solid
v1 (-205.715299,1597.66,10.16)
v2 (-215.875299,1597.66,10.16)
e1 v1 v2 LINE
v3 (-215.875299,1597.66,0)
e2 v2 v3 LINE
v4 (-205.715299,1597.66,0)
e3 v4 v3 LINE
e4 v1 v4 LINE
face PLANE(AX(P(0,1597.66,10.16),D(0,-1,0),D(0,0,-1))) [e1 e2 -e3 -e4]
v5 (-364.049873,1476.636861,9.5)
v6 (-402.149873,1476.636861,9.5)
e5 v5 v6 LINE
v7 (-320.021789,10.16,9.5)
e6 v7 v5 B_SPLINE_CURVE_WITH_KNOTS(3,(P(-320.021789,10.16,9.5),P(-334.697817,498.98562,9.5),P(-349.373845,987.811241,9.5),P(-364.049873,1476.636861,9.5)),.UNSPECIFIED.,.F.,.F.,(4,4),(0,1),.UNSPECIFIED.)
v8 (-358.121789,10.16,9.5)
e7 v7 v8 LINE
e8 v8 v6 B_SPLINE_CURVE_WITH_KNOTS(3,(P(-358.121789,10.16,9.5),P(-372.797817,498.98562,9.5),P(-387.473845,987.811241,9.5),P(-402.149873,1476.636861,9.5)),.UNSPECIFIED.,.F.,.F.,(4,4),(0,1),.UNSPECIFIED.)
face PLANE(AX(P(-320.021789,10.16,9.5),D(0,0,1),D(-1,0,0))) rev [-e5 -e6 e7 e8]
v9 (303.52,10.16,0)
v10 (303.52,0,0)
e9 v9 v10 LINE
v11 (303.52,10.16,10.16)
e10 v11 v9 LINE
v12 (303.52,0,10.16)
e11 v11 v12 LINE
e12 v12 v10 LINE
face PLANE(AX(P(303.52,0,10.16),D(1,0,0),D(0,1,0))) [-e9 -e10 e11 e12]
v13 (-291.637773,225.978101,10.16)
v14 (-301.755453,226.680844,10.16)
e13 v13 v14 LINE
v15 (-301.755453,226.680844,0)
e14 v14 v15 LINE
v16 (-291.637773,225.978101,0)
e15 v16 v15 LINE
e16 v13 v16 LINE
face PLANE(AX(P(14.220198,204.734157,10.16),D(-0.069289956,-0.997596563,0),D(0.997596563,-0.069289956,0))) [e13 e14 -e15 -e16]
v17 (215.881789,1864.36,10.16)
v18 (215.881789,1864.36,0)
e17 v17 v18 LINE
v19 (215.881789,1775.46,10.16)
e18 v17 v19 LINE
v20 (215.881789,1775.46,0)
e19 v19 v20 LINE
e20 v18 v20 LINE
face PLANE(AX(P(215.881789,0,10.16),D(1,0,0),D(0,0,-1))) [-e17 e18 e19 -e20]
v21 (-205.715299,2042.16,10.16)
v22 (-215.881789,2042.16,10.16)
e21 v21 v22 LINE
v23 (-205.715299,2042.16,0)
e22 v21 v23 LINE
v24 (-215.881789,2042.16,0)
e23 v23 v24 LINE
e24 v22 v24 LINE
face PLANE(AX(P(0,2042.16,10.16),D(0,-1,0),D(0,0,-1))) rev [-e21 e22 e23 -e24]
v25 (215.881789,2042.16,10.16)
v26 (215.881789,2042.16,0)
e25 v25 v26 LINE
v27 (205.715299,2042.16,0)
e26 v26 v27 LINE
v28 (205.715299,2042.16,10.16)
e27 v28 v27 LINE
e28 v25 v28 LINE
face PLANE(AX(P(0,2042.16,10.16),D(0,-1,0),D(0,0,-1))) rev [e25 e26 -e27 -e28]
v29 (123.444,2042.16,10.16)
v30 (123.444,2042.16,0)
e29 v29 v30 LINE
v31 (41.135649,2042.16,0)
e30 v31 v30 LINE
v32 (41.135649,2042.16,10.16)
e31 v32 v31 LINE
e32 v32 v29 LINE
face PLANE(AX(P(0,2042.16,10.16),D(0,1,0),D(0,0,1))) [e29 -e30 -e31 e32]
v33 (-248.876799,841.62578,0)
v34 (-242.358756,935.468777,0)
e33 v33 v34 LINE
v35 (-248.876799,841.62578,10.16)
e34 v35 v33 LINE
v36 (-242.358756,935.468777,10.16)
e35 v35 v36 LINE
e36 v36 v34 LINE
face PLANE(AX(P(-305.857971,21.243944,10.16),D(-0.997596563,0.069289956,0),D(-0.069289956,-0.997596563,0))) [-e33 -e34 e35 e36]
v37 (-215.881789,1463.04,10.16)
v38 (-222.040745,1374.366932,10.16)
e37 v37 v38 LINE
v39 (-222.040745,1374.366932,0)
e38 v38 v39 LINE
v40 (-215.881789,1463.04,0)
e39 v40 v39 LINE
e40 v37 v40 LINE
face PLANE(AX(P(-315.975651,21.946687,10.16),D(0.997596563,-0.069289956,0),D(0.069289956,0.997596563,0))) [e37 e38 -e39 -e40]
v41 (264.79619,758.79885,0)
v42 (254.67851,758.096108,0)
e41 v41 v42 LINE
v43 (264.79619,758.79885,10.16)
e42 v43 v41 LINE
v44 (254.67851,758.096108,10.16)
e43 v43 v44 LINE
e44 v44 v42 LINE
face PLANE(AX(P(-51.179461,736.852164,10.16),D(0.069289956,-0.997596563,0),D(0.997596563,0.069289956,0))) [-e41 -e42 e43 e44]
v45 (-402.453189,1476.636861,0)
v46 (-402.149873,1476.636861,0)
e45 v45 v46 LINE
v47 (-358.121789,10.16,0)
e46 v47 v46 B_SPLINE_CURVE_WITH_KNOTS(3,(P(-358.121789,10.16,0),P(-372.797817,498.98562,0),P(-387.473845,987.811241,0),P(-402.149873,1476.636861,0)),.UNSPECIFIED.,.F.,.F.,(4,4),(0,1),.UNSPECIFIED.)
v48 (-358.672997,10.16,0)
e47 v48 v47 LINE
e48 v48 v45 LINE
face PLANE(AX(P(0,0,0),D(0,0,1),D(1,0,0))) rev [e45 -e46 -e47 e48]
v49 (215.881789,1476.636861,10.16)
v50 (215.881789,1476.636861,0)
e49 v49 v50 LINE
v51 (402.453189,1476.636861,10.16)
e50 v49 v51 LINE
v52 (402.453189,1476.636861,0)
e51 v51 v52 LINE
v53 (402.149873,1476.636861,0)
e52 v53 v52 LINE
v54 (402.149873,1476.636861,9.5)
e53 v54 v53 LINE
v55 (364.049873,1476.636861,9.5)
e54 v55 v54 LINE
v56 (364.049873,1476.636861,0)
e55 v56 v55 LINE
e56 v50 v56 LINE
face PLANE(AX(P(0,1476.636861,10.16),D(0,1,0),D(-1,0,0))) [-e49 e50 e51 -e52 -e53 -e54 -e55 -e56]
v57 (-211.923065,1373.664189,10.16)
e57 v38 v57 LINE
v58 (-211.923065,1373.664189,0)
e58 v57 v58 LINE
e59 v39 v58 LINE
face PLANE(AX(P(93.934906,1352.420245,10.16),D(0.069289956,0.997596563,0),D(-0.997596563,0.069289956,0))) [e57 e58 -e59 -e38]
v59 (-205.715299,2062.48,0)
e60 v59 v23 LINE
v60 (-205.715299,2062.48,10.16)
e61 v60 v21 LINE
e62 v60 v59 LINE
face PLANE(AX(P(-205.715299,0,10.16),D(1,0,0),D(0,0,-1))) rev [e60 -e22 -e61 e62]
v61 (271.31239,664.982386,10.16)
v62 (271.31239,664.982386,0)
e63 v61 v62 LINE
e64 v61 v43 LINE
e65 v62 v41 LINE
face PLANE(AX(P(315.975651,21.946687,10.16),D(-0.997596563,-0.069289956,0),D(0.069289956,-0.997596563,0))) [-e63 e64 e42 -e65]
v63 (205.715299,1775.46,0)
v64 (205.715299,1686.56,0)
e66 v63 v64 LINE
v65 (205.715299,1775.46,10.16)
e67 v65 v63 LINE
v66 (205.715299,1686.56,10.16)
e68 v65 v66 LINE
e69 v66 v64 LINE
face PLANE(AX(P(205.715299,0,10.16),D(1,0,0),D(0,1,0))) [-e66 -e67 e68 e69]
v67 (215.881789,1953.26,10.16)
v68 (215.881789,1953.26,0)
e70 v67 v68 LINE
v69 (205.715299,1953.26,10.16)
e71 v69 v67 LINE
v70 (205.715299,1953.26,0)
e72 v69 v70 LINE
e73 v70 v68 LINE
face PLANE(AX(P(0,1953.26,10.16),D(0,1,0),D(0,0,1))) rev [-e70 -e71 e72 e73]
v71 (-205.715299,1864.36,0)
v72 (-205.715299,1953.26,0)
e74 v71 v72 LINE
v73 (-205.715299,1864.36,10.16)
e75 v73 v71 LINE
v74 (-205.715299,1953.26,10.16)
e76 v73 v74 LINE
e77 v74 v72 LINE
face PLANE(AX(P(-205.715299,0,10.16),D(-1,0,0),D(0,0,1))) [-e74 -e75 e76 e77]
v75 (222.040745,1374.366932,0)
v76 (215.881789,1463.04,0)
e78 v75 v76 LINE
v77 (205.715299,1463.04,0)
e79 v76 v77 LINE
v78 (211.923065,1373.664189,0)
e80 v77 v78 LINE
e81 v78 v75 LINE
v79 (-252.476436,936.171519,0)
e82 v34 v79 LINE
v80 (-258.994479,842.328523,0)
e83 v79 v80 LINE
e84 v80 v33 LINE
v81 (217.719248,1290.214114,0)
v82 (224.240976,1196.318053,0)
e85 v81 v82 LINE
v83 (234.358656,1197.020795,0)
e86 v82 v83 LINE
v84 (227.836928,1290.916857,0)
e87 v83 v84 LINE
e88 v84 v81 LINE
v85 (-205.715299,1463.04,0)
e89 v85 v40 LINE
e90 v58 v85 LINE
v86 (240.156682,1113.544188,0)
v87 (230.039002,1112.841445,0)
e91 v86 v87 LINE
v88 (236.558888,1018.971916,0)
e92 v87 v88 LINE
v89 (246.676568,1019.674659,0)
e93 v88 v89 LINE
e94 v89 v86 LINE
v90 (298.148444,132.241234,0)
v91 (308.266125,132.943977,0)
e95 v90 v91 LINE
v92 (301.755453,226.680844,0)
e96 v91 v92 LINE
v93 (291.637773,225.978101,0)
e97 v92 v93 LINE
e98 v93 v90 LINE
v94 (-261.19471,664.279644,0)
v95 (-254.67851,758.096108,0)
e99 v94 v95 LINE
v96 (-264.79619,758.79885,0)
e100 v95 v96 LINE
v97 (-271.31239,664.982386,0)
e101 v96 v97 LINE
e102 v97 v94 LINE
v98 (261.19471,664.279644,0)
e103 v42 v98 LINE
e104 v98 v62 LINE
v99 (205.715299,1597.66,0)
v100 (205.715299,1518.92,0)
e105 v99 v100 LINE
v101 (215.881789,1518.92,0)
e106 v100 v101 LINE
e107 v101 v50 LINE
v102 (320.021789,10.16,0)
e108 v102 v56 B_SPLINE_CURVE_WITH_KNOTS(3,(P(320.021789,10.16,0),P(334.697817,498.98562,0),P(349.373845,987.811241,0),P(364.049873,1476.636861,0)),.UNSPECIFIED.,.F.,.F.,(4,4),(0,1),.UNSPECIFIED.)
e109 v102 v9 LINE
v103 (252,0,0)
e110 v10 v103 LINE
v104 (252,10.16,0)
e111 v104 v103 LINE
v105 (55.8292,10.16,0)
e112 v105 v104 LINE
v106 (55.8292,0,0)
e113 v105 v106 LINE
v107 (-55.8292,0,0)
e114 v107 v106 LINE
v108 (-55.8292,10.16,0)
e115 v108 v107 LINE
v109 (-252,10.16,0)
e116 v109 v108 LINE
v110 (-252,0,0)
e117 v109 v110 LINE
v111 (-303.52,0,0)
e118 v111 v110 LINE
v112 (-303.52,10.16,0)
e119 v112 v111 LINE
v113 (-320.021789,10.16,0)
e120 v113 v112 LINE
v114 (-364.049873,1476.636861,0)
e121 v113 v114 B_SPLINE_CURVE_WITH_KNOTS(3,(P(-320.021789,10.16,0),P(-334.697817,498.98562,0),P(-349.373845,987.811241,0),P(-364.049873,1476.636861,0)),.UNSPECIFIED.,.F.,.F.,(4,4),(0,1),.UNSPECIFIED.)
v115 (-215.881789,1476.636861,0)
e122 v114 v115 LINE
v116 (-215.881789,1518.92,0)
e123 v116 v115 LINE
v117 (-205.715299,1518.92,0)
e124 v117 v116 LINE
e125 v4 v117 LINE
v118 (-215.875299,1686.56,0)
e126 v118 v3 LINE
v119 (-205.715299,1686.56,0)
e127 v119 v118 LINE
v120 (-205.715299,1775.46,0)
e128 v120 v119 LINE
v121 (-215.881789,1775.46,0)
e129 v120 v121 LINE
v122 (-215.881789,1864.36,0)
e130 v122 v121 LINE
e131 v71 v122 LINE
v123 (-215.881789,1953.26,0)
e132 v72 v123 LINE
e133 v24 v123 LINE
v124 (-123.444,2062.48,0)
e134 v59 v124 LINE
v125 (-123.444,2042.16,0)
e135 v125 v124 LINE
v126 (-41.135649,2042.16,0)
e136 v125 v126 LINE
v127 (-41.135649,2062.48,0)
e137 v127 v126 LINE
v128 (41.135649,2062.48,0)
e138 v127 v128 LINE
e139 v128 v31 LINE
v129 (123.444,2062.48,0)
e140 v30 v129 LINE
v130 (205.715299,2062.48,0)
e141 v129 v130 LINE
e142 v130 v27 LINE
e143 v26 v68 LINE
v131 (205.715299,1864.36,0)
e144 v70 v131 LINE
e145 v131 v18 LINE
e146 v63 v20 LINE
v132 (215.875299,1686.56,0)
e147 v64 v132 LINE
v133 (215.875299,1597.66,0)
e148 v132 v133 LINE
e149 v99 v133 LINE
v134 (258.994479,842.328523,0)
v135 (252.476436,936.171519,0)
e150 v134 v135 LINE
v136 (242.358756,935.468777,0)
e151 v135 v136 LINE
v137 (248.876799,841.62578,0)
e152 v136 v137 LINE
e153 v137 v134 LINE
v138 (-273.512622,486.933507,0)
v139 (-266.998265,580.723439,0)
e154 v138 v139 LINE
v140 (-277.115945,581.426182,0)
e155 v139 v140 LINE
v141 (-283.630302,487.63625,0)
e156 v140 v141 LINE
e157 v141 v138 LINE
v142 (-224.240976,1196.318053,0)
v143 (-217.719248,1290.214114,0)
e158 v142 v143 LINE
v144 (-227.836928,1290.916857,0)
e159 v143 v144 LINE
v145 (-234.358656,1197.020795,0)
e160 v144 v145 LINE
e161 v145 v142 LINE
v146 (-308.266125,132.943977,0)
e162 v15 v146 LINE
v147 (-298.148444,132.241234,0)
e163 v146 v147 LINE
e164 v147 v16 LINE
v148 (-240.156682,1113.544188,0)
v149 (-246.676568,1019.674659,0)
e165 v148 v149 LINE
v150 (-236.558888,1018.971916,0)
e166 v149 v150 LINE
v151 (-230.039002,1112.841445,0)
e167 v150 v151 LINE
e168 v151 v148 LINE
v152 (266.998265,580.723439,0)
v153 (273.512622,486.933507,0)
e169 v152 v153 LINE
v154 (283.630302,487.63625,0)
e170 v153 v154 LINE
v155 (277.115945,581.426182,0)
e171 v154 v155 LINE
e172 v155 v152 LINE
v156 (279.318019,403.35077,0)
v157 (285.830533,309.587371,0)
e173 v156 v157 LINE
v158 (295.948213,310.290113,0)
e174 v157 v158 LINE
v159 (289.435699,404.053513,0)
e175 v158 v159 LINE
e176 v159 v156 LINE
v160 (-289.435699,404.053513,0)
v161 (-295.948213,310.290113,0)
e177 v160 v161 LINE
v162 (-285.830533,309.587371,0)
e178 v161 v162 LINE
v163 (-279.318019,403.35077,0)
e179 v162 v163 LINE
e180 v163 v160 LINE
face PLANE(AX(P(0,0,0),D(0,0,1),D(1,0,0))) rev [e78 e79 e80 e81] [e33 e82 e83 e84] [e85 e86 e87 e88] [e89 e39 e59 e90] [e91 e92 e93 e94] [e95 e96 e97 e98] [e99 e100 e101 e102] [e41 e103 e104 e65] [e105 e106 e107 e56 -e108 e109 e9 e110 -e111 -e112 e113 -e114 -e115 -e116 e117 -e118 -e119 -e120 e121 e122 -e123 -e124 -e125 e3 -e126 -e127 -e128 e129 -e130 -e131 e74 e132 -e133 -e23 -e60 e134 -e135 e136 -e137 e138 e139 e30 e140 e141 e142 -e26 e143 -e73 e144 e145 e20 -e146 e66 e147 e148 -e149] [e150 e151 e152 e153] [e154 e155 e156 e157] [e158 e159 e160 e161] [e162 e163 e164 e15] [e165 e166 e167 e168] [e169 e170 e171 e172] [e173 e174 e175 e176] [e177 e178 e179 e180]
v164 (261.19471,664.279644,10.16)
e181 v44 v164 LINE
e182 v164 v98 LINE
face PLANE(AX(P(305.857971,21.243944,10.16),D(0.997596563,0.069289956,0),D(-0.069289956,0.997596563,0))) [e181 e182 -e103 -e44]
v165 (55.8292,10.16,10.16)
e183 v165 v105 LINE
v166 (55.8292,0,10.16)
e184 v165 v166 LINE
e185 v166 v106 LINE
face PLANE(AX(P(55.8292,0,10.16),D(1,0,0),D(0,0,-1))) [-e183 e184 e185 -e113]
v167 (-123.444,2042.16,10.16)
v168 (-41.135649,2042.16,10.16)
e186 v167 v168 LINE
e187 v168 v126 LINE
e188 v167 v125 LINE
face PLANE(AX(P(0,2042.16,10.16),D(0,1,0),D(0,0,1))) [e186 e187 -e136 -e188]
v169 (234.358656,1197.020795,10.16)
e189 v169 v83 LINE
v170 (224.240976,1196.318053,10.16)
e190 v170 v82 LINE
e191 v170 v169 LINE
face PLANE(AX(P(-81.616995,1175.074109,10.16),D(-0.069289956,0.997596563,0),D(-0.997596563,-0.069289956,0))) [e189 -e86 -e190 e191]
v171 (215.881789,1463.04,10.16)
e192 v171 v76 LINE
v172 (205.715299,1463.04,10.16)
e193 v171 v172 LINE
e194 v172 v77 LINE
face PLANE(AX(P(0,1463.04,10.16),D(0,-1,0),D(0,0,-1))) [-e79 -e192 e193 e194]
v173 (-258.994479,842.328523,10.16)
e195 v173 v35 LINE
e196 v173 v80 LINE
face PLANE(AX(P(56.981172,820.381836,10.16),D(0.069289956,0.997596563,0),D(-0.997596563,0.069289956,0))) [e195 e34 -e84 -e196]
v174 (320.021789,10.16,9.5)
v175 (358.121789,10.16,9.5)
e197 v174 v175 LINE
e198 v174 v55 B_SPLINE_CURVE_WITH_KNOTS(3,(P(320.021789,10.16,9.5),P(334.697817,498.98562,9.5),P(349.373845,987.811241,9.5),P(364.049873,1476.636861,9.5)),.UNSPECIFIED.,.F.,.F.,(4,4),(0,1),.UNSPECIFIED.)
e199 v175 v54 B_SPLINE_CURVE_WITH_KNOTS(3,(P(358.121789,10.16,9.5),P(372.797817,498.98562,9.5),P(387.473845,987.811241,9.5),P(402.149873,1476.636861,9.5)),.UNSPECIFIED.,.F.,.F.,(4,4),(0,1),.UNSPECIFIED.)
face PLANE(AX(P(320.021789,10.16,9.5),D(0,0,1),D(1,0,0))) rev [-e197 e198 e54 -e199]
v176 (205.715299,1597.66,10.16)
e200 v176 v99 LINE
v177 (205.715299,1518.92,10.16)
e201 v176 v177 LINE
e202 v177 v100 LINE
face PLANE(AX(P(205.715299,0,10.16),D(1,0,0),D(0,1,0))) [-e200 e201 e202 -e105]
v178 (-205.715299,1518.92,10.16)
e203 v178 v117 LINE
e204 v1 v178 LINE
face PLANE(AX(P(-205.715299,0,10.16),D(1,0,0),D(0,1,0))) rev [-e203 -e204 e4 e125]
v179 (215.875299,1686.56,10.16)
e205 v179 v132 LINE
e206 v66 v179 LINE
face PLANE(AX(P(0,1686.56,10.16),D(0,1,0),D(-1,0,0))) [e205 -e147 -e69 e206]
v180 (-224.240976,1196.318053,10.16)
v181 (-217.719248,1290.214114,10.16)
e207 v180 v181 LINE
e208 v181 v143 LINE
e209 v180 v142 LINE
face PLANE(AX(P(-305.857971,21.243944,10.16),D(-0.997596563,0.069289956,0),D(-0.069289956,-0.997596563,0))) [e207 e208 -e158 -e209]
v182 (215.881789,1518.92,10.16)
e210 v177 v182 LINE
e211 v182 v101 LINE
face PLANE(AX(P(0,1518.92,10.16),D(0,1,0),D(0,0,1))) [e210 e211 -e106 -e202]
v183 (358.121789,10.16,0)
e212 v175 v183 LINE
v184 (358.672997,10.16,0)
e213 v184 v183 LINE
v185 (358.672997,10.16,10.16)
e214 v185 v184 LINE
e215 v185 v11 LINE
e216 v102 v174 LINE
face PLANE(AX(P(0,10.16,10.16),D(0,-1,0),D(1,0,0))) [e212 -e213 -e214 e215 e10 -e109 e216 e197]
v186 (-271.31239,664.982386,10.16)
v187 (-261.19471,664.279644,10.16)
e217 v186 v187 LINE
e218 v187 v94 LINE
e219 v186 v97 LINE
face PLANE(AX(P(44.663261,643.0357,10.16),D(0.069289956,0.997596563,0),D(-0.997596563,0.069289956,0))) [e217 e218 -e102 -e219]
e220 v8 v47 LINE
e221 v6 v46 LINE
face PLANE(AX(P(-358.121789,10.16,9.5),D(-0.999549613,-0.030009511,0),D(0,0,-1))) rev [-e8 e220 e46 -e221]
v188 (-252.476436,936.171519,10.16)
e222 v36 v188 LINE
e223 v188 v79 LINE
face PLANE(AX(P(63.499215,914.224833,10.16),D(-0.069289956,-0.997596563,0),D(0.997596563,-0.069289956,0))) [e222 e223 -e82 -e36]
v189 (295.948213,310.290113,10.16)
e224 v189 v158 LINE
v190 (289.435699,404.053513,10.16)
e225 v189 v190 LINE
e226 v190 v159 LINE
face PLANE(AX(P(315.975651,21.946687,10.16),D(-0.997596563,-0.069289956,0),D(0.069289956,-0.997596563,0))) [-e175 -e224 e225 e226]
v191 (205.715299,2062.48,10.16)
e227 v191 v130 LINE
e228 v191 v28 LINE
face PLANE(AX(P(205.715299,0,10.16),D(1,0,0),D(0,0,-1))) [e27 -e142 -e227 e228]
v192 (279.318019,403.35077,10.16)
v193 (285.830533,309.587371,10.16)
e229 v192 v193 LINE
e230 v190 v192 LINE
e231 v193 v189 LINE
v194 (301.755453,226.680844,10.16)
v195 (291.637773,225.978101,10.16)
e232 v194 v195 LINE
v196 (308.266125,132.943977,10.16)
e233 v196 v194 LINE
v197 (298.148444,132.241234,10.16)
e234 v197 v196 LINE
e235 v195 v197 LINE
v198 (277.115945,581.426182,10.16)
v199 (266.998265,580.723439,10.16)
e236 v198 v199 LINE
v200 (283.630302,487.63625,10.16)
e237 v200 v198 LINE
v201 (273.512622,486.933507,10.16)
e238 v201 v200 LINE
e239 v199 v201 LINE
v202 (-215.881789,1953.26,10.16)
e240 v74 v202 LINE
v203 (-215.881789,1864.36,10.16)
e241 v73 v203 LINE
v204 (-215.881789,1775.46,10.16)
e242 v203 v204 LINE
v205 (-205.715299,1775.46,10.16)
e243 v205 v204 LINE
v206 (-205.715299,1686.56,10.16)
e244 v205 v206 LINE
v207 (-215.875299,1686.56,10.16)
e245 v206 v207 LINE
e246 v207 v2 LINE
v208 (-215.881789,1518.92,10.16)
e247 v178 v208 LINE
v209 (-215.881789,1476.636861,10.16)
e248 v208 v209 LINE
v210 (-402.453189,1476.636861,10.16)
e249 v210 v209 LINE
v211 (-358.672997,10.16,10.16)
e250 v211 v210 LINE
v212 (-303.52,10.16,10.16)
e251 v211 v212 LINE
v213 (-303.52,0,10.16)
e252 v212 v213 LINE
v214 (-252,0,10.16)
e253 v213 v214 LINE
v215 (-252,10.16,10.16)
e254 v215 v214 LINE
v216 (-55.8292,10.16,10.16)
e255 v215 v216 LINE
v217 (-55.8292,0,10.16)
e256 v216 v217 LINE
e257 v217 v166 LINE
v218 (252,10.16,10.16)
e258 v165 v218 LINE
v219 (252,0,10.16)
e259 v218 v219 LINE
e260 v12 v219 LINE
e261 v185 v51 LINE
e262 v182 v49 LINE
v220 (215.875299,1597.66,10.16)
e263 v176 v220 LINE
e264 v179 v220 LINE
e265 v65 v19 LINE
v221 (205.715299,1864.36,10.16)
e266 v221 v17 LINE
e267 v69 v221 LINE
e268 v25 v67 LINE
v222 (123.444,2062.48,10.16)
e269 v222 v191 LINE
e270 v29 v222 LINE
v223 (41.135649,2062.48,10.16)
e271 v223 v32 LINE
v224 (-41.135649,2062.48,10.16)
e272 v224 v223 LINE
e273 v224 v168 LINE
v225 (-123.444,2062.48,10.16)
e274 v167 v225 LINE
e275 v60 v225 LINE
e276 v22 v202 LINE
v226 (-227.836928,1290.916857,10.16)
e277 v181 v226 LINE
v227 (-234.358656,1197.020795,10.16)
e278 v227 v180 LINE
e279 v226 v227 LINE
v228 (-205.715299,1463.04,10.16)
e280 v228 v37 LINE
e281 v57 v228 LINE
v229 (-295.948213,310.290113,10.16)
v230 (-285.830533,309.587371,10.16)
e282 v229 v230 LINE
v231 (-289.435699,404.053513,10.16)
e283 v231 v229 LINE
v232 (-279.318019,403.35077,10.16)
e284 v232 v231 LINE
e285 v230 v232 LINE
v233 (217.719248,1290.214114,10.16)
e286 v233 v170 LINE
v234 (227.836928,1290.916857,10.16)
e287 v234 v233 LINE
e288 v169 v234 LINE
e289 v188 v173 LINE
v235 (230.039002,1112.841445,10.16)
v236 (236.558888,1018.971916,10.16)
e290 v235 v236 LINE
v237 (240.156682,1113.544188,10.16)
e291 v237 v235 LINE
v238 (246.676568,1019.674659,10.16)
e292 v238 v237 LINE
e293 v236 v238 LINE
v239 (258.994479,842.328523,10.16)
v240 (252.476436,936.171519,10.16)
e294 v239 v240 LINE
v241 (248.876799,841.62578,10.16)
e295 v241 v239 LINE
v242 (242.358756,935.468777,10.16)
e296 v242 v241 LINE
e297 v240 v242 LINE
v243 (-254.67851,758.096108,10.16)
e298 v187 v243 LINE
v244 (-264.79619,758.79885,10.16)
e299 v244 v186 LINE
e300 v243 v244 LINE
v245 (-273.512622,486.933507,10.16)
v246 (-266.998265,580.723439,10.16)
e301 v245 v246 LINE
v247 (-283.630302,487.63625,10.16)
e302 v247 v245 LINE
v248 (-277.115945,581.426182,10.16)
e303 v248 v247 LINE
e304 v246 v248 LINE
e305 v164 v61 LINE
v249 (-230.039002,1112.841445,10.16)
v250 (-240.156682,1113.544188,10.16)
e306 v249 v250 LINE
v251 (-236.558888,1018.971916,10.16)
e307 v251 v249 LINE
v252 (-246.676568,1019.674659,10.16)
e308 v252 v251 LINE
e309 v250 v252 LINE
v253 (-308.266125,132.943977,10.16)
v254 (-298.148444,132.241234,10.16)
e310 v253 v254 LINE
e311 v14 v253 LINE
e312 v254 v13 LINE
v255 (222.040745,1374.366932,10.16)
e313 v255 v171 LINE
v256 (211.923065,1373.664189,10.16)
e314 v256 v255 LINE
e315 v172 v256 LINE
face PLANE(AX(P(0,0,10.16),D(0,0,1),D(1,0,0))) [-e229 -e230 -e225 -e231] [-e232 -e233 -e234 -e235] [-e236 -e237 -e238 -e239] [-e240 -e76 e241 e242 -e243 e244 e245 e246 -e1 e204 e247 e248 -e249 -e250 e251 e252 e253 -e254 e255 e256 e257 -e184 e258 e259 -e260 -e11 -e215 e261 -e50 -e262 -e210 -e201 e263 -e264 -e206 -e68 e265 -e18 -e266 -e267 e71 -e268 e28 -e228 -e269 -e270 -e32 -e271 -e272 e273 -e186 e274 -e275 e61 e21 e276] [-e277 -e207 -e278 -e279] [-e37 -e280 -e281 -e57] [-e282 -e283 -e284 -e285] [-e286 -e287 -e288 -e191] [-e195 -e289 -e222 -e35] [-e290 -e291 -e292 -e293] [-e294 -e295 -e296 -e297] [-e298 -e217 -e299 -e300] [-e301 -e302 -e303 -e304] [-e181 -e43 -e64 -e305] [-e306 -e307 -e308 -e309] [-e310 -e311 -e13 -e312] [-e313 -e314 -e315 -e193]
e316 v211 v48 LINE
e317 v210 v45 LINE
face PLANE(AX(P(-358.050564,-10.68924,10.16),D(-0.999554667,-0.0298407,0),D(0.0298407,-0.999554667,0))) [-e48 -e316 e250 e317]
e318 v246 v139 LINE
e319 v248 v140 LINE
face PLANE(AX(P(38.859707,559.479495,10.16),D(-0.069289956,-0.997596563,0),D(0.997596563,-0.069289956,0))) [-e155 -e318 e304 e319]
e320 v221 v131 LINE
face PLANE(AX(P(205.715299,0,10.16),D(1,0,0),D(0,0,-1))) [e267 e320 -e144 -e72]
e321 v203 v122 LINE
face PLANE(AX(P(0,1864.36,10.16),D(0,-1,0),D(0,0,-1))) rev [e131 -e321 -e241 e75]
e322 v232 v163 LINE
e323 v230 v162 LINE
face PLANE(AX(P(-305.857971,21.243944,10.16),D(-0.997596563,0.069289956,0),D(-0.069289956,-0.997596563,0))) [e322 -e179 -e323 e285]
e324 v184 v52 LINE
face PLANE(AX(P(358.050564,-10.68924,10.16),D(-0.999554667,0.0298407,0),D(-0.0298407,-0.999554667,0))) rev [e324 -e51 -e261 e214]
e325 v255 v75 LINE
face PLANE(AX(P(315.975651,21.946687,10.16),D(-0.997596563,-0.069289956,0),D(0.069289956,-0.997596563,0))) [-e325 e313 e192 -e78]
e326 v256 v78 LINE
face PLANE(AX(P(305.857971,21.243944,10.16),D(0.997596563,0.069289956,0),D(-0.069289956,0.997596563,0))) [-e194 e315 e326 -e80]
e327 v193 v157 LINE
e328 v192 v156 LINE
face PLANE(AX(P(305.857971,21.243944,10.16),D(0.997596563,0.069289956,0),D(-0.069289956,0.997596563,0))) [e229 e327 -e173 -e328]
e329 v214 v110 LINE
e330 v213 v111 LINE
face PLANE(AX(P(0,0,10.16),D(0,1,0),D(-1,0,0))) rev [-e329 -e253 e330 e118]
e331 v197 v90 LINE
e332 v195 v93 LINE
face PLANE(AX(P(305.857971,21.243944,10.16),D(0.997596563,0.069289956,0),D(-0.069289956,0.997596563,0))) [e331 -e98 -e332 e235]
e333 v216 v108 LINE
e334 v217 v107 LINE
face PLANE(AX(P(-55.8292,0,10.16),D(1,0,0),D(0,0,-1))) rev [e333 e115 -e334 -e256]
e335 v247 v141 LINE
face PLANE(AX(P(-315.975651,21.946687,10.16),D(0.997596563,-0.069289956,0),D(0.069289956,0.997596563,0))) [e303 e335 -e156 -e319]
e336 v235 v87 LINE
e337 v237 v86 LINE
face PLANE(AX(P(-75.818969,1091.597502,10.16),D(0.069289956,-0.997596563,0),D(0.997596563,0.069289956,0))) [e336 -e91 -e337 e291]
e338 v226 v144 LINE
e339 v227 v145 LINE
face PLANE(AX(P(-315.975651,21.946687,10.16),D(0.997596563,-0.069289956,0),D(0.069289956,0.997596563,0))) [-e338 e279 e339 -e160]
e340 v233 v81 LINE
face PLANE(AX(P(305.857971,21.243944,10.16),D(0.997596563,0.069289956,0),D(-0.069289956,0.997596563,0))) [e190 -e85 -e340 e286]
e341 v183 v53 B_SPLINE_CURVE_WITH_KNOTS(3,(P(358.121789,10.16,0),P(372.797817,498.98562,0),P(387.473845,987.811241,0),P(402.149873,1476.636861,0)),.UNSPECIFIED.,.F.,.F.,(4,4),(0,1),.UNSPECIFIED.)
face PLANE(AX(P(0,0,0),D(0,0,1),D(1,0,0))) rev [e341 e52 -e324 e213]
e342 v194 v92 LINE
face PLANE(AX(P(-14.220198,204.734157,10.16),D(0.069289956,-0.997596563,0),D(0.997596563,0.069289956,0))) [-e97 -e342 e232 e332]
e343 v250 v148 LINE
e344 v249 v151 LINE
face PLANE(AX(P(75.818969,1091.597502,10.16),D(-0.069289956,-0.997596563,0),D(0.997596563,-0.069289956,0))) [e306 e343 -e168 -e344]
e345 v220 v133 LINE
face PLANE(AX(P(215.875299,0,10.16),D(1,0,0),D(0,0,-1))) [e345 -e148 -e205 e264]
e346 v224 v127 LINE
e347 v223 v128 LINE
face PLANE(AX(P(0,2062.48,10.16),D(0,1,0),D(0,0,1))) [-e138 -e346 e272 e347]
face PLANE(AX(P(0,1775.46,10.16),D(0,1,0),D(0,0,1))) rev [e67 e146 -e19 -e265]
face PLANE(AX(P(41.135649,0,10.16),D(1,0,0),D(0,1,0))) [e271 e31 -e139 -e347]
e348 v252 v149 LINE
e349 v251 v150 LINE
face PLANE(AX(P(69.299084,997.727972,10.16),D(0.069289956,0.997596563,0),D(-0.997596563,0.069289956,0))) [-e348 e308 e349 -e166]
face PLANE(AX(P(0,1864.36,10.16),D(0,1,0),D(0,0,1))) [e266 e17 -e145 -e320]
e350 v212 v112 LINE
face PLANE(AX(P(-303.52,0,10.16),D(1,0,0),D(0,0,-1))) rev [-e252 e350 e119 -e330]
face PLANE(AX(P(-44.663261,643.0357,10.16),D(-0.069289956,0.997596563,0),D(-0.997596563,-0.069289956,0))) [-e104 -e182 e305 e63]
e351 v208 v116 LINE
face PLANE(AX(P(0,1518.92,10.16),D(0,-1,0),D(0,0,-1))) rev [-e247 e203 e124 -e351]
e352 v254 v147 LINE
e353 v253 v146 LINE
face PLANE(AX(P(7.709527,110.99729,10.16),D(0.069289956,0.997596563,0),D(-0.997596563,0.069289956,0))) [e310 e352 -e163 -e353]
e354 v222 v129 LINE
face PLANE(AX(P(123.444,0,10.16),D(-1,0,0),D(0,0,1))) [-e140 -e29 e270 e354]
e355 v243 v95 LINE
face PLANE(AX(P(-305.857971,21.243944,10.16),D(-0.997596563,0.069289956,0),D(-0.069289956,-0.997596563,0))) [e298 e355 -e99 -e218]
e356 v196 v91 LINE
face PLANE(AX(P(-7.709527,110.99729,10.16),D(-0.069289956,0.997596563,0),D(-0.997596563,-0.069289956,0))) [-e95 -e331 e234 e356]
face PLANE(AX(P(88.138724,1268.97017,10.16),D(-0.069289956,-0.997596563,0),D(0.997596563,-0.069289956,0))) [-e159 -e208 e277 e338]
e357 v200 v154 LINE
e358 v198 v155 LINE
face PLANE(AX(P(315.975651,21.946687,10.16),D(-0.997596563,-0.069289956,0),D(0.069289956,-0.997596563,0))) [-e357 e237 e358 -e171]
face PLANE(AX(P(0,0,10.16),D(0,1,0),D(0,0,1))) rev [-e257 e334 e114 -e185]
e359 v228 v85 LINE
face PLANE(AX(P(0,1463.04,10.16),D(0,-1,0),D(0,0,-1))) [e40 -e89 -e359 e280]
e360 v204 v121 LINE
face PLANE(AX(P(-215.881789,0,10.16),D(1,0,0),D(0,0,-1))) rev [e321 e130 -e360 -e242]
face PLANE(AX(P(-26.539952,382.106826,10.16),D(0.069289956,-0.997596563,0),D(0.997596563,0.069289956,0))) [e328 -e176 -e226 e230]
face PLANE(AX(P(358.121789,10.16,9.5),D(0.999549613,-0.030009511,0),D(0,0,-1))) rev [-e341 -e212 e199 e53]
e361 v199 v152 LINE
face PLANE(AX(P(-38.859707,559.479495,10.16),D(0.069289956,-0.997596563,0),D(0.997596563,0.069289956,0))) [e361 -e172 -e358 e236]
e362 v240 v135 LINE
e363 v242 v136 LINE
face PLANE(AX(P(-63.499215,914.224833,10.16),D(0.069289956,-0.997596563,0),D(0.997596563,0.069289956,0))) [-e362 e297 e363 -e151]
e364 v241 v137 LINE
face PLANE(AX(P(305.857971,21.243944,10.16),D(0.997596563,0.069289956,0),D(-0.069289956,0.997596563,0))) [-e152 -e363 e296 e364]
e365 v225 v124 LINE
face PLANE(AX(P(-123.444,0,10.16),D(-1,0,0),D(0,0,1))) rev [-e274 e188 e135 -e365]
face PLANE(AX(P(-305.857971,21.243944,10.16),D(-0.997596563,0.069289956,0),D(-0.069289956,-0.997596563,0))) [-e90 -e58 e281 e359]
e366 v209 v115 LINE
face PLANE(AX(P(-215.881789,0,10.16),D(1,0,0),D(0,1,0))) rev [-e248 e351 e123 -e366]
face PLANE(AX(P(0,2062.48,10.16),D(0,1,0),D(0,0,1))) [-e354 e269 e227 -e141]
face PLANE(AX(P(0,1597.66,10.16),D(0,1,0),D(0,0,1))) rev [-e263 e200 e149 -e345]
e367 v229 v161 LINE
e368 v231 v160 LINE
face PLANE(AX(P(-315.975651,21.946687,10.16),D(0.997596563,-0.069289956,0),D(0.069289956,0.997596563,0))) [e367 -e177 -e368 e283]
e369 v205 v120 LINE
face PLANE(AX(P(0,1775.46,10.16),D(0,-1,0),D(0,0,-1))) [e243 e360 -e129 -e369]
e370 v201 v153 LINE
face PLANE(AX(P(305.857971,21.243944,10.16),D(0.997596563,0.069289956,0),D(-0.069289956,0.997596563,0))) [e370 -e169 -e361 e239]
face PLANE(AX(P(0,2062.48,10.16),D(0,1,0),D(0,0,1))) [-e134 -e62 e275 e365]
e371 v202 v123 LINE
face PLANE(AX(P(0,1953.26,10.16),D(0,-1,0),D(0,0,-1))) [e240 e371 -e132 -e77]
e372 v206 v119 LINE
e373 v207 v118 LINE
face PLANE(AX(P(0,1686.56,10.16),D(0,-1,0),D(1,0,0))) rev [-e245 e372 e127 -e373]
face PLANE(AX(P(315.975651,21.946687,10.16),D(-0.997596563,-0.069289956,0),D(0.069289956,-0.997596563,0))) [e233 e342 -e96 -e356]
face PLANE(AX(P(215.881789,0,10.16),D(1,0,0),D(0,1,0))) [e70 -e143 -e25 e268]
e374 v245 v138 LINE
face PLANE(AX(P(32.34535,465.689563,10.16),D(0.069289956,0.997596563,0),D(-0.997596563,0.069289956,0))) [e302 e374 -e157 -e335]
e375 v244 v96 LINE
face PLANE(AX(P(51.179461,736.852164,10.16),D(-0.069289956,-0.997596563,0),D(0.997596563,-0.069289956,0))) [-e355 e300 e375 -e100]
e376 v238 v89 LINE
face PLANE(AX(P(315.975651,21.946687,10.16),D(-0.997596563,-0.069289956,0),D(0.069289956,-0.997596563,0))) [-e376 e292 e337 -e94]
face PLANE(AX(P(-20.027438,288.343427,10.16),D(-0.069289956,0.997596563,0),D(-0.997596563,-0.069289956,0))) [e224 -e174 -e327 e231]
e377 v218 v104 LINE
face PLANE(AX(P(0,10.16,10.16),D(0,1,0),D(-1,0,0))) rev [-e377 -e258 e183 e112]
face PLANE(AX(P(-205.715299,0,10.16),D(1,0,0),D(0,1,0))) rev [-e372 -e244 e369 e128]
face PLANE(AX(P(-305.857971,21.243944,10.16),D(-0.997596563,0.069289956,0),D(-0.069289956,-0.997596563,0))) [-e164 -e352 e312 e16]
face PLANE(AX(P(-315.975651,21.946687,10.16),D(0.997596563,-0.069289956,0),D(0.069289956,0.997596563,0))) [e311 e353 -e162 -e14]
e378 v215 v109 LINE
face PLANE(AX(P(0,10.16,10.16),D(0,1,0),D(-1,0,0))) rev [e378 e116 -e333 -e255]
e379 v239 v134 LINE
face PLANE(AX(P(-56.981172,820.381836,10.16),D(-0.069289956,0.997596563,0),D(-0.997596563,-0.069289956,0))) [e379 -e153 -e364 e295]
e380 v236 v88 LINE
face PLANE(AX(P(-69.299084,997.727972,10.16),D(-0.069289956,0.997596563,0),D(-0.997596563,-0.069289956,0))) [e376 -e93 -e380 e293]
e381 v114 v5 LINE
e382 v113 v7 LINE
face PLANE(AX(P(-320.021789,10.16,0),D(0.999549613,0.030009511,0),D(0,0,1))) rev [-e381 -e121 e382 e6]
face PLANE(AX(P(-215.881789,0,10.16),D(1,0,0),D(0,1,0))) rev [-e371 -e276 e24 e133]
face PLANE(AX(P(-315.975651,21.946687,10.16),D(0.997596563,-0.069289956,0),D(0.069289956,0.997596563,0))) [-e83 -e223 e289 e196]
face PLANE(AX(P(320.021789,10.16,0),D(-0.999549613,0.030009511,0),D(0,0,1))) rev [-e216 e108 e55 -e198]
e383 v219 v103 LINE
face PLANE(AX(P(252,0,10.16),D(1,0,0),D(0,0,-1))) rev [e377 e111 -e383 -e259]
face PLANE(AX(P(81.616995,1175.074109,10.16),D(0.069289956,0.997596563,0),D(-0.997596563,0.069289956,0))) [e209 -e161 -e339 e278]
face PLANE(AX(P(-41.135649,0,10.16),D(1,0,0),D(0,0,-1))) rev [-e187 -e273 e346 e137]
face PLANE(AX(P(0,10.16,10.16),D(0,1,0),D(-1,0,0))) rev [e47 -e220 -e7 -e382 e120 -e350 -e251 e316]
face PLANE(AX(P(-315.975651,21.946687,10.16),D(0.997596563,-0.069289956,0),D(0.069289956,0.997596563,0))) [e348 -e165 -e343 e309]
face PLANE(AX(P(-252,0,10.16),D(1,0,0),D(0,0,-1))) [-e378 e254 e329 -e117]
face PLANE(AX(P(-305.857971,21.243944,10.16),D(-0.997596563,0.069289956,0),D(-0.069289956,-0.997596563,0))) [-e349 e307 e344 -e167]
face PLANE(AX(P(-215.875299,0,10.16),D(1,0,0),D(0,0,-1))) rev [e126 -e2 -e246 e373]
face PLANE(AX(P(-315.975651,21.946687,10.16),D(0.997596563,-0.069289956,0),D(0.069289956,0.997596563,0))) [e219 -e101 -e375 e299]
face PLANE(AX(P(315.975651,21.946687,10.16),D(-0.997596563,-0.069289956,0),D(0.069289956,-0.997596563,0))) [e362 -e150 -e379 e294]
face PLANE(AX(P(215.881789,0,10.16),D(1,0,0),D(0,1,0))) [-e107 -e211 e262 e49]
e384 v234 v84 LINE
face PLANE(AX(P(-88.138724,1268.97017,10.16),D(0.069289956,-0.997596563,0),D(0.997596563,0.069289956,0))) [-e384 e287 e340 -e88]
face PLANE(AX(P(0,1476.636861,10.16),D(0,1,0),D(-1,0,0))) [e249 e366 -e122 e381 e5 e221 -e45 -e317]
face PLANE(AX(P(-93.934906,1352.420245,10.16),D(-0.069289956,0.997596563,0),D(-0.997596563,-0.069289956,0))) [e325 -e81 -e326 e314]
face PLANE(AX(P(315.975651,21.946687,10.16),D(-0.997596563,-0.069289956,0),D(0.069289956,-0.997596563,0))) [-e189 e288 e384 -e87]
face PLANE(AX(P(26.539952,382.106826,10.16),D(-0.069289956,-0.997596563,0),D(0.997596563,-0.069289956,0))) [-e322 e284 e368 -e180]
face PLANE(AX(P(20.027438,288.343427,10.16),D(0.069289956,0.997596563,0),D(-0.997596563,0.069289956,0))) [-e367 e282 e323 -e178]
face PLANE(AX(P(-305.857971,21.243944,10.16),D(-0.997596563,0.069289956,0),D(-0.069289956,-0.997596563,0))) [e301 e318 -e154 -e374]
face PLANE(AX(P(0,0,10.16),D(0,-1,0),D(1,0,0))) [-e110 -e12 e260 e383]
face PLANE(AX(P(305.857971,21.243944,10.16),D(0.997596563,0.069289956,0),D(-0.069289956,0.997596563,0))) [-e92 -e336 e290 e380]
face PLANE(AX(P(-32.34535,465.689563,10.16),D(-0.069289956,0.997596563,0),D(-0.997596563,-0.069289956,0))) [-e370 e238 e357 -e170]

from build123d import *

# Parameters (mm, degrees)
BOSS_EXTRUDE1_DEPTH = 10.16
CUT_LOFT1_START     = 319.572758977
CUT_LOFT1_OUTLINE_W = 1472
CUT_LOFT1_OUTLINE_H = 11.5
CUT_LOFT1_DEPTH     = 38.082840263


# Read off the part's stored shape, not the designer's step: Cut-Loft1
with BuildPart() as part:
    # Sketch1 → Boss-Extrude1 (new body)
    # profile 1 of 2: a face of its own
    with BuildSketch(Plane.XY):
        Polygon((205.715298803, 2062.48), (123.444, 2062.48), (123.444, 2042.16), (41.135649402, 2042.16), (41.135649402, 2062.48), (-41.135649402, 2062.48), (-41.135649402, 2042.16), (-123.444, 2042.16), (-123.444, 2062.48), (-205.715298803, 2062.48), (-205.715298803, 2042.16), (-215.881789204, 2042.16), (-215.881789204, 1953.26), (-205.715298803, 1953.26), (-205.715298803, 1864.36), (-215.881789204, 1864.36), (-215.881789204, 1775.46), (-205.715298803, 1775.46), (-205.715298803, 1686.56), (-215.875298803, 1686.56), (-215.875298803, 1597.66), (-205.715298803, 1597.66), (-205.715298803, 1518.92), (205.715298803, 1518.92), (205.715298803, 1597.66), (215.875298803, 1597.66), (215.875298803, 1686.56), (205.715298803, 1686.56), (205.715298803, 1775.46), (215.881789204, 1775.46), (215.881789204, 1864.36), (205.715298803, 1864.36), (205.715298803, 1953.26), (215.881789204, 1953.26), (215.881789204, 2042.16), (205.715298803, 2042.16), align=None)
    # profile 2 of 2: a face of its own
    with BuildSketch(Plane.XY):
        Polygon((215.881789204, 1518.92), (205.715298803, 1518.92), (-205.715298803, 1518.92), (-215.881789204, 1518.92), (-215.881789204, 1476.636861244), (-402.453189401, 1476.636861244), (-358.672996954, 10.16), (-303.52, 10.16), (-303.52, 0), (-252, 0), (-252, 10.16), (-55.8292, 10.16), (-55.8292, 0), (55.8292, 0), (55.8292, 10.16), (252, 10.16), (252, 0), (303.52, 0), (303.52, 10.16), (358.672996954, 10.16), (402.453189401, 1476.636861244), (215.881789204, 1476.636861244), align=None)
        Polygon((-308.266124544, 132.94397688), (-301.755453134, 226.680843836), (-291.63777305, 225.978101227), (-298.14844446, 132.241234271), align=None, mode=Mode.SUBTRACT)
        Polygon((-289.435698895, 404.053512688), (-279.318018811, 403.350770078), (-285.830533081, 309.587370692), (-295.948213166, 310.290113301), align=None, mode=Mode.SUBTRACT)
        Polygon((-283.630301787, 487.636249721), (-277.115944656, 581.426181539), (-266.998264572, 580.72343893), (-273.512621703, 486.933507112), align=None, mode=Mode.SUBTRACT)
        Polygon((-264.796190418, 758.798850391), (-254.678510334, 758.096107781), (-261.194710324, 664.279643533), (-271.312390408, 664.982386142), align=None, mode=Mode.SUBTRACT)
        Polygon((-252.476436179, 936.171519242), (-242.358756095, 935.468776633), (-248.876798945, 841.625779953), (-258.99447903, 842.328522563), align=None, mode=Mode.SUBTRACT)
        Polygon((301.755453134, 226.680843836), (308.266124544, 132.94397688), (298.14844446, 132.241234271), (291.63777305, 225.978101227), align=None, mode=Mode.SUBTRACT)
        Polygon((279.318018811, 403.350770078), (289.435698895, 404.053512688), (295.948213166, 310.290113301), (285.830533081, 309.587370692), align=None, mode=Mode.SUBTRACT)
        Polygon((277.115944656, 581.426181539), (283.630301787, 487.636249721), (273.512621703, 486.933507112), (266.998264572, 580.72343893), align=None, mode=Mode.SUBTRACT)
        Polygon((254.678510334, 758.096107781), (264.796190418, 758.798850391), (271.312390408, 664.982386142), (261.194710324, 664.279643533), align=None, mode=Mode.SUBTRACT)
        Polygon((242.358756095, 935.468776633), (252.476436179, 936.171519242), (258.99447903, 842.328522563), (248.876798945, 841.625779953), align=None, mode=Mode.SUBTRACT)
        Polygon((-240.15668194, 1113.544188093), (-230.039001856, 1112.841445484), (-236.558887567, 1018.971916374), (-246.676567651, 1019.674658983), align=None, mode=Mode.SUBTRACT)
        Polygon((-227.836927701, 1290.916856945), (-217.719247617, 1290.214114336), (-224.240976188, 1196.318052795), (-234.358656272, 1197.020795404), align=None, mode=Mode.SUBTRACT)
        Polygon((-206.420980822, 1452.880000035), (-211.92306481, 1373.664189215), (-222.040744894, 1374.366931824), (-215.881789204, 1463.040000035), (-205.715298803, 1463.040000035), align=None, mode=Mode.SUBTRACT)
        Polygon((230.039001856, 1112.841445484), (240.15668194, 1113.544188093), (246.676567651, 1019.674658983), (236.558887567, 1018.971916374), align=None, mode=Mode.SUBTRACT)
        Polygon((217.719247617, 1290.214114336), (227.836927701, 1290.916856945), (234.358656272, 1197.020795404), (224.240976188, 1196.318052795), align=None, mode=Mode.SUBTRACT)
        Polygon((205.715298803, 1463.040000035), (215.881789204, 1463.040000035), (222.040744894, 1374.366931824), (211.92306481, 1373.664189215), (206.420980822, 1452.880000035), align=None, mode=Mode.SUBTRACT)
    extrude(amount=BOSS_EXTRUDE1_DEPTH)

    # Cut-Loft1 outline → Cut-Loft1 (cut)
    with BuildSketch(Plane(origin=(0, 0, 0), x_dir=(0.030009511302642098, 0.9995496131915498, 0), z_dir=(0.9995496131915498, -0.030009511302642095, 0)).offset(CUT_LOFT1_START)):
        with Locations((754, 3.75)):
            Rectangle(CUT_LOFT1_OUTLINE_W, CUT_LOFT1_OUTLINE_H)
    cut_loft1 = extrude(amount=CUT_LOFT1_DEPTH, mode=Mode.SUBTRACT)

    # Mirror1: Cut-Loft1 across plane
    add(cut_loft1.mirror(Plane(origin=(0, 0, 0), x_dir=(0, 0, 1), z_dir=(1, 0, 0))), mode=Mode.SUBTRACT)


solid = part.part
